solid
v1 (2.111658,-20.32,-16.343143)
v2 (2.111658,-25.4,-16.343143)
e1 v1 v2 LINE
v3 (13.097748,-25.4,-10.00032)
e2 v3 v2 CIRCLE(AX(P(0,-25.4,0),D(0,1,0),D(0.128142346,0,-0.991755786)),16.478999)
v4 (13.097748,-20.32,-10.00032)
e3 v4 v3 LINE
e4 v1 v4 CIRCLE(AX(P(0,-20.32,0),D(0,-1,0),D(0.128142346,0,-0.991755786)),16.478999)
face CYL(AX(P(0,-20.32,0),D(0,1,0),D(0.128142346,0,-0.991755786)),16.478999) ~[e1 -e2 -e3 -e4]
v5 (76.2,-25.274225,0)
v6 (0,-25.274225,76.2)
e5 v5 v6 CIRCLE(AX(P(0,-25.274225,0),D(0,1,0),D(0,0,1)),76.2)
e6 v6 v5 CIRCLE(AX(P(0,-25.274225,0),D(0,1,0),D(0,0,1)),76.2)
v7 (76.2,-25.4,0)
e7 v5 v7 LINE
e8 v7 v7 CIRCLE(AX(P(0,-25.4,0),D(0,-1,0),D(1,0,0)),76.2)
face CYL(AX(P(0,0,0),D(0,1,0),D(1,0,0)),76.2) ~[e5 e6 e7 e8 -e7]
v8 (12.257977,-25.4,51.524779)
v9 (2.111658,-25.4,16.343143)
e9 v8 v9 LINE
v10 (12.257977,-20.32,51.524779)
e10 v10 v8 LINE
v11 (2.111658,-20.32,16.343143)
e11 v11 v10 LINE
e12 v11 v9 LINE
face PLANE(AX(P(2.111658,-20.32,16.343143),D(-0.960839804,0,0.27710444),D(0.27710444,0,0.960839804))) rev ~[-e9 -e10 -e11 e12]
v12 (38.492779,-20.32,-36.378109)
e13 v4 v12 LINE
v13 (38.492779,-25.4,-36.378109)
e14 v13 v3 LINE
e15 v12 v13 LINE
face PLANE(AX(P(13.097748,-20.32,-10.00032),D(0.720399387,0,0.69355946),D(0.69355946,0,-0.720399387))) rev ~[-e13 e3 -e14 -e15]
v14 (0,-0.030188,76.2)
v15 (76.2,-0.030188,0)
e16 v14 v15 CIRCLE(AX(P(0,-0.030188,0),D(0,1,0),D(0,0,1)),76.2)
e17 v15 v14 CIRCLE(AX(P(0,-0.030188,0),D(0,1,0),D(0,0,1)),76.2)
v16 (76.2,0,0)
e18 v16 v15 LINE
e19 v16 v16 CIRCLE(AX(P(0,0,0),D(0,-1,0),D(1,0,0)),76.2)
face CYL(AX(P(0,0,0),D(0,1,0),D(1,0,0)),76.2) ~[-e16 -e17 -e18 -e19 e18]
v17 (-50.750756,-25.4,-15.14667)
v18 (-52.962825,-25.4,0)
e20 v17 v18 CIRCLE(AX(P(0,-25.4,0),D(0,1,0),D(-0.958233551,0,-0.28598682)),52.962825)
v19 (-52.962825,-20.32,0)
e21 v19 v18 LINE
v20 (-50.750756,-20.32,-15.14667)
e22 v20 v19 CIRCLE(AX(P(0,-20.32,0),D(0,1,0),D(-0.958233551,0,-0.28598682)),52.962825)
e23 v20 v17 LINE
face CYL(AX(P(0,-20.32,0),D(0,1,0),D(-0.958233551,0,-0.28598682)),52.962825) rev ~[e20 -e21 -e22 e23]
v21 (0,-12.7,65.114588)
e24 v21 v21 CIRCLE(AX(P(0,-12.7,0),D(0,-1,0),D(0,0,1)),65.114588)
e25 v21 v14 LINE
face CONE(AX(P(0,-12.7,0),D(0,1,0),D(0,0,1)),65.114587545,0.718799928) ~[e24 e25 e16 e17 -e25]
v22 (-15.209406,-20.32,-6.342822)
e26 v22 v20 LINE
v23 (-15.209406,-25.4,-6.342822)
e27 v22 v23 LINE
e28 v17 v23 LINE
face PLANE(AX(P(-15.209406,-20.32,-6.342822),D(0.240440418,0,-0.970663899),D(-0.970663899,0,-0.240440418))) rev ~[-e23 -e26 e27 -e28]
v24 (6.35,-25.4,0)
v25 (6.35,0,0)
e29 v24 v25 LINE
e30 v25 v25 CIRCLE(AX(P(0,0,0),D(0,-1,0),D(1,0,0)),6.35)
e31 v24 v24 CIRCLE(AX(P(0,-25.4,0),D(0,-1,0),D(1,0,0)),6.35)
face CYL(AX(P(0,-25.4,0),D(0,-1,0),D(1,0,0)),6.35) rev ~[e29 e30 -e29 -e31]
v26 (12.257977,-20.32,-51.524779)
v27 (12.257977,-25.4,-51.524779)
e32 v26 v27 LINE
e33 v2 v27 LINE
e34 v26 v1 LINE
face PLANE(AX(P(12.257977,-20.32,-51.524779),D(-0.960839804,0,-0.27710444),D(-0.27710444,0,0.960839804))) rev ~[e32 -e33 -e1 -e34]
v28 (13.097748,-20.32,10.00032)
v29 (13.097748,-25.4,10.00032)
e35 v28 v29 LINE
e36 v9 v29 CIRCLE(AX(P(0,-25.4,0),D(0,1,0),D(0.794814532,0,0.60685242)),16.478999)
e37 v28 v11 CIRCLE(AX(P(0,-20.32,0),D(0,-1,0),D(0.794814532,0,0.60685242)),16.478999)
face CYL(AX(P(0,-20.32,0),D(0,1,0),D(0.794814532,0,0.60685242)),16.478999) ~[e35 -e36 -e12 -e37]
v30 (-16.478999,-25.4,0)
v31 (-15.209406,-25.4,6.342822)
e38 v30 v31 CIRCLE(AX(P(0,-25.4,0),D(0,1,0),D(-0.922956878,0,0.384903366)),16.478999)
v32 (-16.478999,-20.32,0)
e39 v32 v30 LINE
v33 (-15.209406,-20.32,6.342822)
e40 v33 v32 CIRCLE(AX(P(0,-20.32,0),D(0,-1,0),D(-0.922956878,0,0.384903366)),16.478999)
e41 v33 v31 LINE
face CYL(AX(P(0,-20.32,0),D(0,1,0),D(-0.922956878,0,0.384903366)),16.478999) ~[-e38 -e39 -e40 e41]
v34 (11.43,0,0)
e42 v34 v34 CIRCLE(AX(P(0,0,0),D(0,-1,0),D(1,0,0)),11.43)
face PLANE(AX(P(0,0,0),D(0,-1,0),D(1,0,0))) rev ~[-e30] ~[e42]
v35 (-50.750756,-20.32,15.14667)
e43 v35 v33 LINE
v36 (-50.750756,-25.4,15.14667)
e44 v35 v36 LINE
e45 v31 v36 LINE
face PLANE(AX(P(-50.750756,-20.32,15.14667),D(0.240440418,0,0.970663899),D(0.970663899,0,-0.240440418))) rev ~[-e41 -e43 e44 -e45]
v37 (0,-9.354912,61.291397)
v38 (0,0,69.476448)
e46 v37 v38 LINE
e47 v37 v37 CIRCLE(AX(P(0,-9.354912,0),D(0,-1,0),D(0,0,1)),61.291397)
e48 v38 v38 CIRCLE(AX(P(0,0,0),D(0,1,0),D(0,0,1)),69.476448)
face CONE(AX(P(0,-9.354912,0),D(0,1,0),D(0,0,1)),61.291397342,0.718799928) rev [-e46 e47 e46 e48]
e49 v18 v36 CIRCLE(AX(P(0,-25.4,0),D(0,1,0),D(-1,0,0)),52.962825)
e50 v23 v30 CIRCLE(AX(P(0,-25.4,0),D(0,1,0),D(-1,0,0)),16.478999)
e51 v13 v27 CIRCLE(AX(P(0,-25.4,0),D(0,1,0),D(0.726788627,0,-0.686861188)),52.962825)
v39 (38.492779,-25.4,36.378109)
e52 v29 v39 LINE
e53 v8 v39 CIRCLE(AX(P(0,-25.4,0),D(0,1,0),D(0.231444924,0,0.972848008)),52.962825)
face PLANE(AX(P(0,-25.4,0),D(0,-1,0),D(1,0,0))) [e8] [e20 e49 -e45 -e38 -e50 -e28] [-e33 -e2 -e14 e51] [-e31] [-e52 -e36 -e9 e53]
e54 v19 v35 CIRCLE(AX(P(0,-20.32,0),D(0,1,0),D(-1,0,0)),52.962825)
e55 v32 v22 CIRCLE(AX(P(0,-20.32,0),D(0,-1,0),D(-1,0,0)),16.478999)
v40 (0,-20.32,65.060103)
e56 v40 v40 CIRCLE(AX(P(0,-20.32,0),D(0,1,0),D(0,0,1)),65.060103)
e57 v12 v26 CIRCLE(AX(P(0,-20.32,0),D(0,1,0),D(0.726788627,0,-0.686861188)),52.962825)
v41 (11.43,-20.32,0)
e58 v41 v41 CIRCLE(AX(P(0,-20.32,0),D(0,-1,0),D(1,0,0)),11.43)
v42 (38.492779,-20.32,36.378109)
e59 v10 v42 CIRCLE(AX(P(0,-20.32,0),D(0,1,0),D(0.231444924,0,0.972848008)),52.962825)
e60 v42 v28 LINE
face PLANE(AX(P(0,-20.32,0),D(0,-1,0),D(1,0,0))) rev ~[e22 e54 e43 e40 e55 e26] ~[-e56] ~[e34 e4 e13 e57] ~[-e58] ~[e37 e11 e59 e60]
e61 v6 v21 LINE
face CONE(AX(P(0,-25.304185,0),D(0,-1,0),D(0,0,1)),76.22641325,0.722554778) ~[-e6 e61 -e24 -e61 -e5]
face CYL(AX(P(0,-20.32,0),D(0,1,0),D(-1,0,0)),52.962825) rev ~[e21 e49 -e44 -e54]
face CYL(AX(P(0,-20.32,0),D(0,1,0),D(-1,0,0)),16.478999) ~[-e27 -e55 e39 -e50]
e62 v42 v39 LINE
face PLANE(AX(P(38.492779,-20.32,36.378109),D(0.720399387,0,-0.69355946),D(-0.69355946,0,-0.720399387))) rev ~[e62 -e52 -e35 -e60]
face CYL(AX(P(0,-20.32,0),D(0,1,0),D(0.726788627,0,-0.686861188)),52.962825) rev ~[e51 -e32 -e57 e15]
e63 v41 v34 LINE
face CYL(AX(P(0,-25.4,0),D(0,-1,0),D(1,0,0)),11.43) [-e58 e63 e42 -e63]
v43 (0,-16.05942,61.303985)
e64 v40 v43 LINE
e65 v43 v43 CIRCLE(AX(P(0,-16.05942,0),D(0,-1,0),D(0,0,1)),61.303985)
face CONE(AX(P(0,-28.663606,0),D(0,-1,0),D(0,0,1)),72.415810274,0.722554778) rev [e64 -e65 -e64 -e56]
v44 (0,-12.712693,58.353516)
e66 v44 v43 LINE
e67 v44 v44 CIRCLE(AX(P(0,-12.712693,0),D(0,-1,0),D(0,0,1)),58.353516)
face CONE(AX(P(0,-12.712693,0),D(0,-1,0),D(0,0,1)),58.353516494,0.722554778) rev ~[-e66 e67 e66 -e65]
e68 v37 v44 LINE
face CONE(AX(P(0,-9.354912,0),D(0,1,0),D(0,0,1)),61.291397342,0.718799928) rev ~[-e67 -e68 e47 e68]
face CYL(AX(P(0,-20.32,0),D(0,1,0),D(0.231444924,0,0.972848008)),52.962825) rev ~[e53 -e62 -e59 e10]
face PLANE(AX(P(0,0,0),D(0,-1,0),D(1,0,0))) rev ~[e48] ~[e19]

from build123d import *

# Parameters (mm, degrees)
F0_R     = 76.2
F1_DEPTH = 25.4
F4_R     = 6.35
F5_DEPTH = 25.4
F6_T     = 5.08
F8_DEPTH = 5.081


# Not quite as in the source:
# - a shell that OpenCascade refuses in one call is made with other operations: the cavity is built on its own and cut out


with BuildPart() as f1:
    # F0 (on Front) → F1 (new body)
    with BuildSketch(Plane.XZ):
        Circle(F0_R)
    extrude(amount=F1_DEPTH)

    # F2 (on Right) → F3 (revolve, cut)
    with BuildSketch(Plane.YZ):
        Polygon((-12.7, 65.1145875454), (0, 76.22641325), (-12.7, 76.22641325), (-25.3041852266, 76.22641325), align=None)
    revolve(axis=Axis((0, -25.4, 0), (0, -1, 0)), mode=Mode.SUBTRACT)

    # F4 (on face) → F5 (cut)
    with BuildSketch(Plane.XZ.offset(25.4)):
        Circle(F4_R)
    extrude(amount=-F5_DEPTH, mode=Mode.SUBTRACT)

    # F6: shell of thickness 5.08, made by hand


with BuildPart() as f6_core1:
    # F6_t2: copy of F1
    add(f1.part)

    # the walls: a layer under each face that stays
    f6_faces = [f6_core1.faces().sort_by_distance(p)[0] for p in [
        (-76.2, -0.0150942016, 0),
        (0, -6.3650942016, -70.6572937727),
        (-6.35, -12.7, 0),
        (0, -18.9871122894, -70.6572937727),
        (-50.8, -25.4, -50.8),
        (-76.2, -25.3371122894, 0),
    ]]
    thicken(f6_faces, amount=-F6_T, mode=Mode.SUBTRACT)

    # F6_s3 → F6_t4 (revolve, cut)
    with BuildSketch(Plane.YZ):
        Polygon((-12.6998566811, 65.1909254772), (-9.3549115607, 61.2913973417), (-12.712693419, 58.3535164942), (-16.0594203306, 61.3039845692), align=None)
    revolve(axis=Axis((0, -12.7, 0), (0, -1, 0)), mode=Mode.SUBTRACT)


with BuildPart() as f1_1:
    add(f1.part)

    # what is left inside the walls is the cavity
    f6_cavity = [f6_core1.part.solids().sort_by_distance(p)[0] for p in [
        (0, -0.0508, -23.158816),
    ]]
    add(f6_cavity, mode=Mode.SUBTRACT)

    # F7 (on face) → F8 (cut, through all)
    with BuildSketch(Plane(origin=(0, -20.32, 0), x_dir=(-1, 0, 0), z_dir=(0, 1, 0))):
        with BuildLine():
            ThreePointArc((50.750755659, -15.1466698341), (52.4068897458, -7.6536732487), (52.9628247644, 0))
            ThreePointArc((52.9628247644, 0), (52.4068897458, 7.6536732487), (50.750755659, 15.1466698341))
            Line((50.750755659, 15.1466698341), (15.2094055185, 6.3428222009))
            ThreePointArc((15.2094055185, 6.3428222009), (16.1584836664, 3.2343183675), (16.4789990503, 0))
            ThreePointArc((16.4789990503, 0), (16.1584836664, -3.2343183675), (15.2094055185, -6.3428222009))
            Line((15.2094055185, -6.3428222009), (50.750755659, -15.1466698341))
        make_face()
        with BuildLine():
            ThreePointArc((-38.4927786886, -36.3781087449), (-26.4814123822, -45.8671517021), (-12.2579769704, -51.524778579))
            Line((-12.2579769704, -51.524778579), (-2.1116576016, -16.343142656))
            ThreePointArc((-2.1116576016, -16.343142656), (-8.2394995251, -14.2712318065), (-13.0977479169, -10.000320455))
            Line((-13.0977479169, -10.000320455), (-38.4927786886, -36.3781087449))
        make_face()
        with BuildLine():
            Line((-2.1116576016, 16.343142656), (-12.2579769704, 51.524778579))
            ThreePointArc((-12.2579769704, 51.524778579), (-26.4814123822, 45.8671517021), (-38.4927786886, 36.3781087449))
            Line((-38.4927786886, 36.3781087449), (-13.0977479169, 10.000320455))
            ThreePointArc((-13.0977479169, 10.000320455), (-8.2394995251, 14.2712318065), (-2.1116576016, 16.343142656))
        make_face()
    extrude(amount=-F8_DEPTH, mode=Mode.SUBTRACT)


solid = f1_1.part
